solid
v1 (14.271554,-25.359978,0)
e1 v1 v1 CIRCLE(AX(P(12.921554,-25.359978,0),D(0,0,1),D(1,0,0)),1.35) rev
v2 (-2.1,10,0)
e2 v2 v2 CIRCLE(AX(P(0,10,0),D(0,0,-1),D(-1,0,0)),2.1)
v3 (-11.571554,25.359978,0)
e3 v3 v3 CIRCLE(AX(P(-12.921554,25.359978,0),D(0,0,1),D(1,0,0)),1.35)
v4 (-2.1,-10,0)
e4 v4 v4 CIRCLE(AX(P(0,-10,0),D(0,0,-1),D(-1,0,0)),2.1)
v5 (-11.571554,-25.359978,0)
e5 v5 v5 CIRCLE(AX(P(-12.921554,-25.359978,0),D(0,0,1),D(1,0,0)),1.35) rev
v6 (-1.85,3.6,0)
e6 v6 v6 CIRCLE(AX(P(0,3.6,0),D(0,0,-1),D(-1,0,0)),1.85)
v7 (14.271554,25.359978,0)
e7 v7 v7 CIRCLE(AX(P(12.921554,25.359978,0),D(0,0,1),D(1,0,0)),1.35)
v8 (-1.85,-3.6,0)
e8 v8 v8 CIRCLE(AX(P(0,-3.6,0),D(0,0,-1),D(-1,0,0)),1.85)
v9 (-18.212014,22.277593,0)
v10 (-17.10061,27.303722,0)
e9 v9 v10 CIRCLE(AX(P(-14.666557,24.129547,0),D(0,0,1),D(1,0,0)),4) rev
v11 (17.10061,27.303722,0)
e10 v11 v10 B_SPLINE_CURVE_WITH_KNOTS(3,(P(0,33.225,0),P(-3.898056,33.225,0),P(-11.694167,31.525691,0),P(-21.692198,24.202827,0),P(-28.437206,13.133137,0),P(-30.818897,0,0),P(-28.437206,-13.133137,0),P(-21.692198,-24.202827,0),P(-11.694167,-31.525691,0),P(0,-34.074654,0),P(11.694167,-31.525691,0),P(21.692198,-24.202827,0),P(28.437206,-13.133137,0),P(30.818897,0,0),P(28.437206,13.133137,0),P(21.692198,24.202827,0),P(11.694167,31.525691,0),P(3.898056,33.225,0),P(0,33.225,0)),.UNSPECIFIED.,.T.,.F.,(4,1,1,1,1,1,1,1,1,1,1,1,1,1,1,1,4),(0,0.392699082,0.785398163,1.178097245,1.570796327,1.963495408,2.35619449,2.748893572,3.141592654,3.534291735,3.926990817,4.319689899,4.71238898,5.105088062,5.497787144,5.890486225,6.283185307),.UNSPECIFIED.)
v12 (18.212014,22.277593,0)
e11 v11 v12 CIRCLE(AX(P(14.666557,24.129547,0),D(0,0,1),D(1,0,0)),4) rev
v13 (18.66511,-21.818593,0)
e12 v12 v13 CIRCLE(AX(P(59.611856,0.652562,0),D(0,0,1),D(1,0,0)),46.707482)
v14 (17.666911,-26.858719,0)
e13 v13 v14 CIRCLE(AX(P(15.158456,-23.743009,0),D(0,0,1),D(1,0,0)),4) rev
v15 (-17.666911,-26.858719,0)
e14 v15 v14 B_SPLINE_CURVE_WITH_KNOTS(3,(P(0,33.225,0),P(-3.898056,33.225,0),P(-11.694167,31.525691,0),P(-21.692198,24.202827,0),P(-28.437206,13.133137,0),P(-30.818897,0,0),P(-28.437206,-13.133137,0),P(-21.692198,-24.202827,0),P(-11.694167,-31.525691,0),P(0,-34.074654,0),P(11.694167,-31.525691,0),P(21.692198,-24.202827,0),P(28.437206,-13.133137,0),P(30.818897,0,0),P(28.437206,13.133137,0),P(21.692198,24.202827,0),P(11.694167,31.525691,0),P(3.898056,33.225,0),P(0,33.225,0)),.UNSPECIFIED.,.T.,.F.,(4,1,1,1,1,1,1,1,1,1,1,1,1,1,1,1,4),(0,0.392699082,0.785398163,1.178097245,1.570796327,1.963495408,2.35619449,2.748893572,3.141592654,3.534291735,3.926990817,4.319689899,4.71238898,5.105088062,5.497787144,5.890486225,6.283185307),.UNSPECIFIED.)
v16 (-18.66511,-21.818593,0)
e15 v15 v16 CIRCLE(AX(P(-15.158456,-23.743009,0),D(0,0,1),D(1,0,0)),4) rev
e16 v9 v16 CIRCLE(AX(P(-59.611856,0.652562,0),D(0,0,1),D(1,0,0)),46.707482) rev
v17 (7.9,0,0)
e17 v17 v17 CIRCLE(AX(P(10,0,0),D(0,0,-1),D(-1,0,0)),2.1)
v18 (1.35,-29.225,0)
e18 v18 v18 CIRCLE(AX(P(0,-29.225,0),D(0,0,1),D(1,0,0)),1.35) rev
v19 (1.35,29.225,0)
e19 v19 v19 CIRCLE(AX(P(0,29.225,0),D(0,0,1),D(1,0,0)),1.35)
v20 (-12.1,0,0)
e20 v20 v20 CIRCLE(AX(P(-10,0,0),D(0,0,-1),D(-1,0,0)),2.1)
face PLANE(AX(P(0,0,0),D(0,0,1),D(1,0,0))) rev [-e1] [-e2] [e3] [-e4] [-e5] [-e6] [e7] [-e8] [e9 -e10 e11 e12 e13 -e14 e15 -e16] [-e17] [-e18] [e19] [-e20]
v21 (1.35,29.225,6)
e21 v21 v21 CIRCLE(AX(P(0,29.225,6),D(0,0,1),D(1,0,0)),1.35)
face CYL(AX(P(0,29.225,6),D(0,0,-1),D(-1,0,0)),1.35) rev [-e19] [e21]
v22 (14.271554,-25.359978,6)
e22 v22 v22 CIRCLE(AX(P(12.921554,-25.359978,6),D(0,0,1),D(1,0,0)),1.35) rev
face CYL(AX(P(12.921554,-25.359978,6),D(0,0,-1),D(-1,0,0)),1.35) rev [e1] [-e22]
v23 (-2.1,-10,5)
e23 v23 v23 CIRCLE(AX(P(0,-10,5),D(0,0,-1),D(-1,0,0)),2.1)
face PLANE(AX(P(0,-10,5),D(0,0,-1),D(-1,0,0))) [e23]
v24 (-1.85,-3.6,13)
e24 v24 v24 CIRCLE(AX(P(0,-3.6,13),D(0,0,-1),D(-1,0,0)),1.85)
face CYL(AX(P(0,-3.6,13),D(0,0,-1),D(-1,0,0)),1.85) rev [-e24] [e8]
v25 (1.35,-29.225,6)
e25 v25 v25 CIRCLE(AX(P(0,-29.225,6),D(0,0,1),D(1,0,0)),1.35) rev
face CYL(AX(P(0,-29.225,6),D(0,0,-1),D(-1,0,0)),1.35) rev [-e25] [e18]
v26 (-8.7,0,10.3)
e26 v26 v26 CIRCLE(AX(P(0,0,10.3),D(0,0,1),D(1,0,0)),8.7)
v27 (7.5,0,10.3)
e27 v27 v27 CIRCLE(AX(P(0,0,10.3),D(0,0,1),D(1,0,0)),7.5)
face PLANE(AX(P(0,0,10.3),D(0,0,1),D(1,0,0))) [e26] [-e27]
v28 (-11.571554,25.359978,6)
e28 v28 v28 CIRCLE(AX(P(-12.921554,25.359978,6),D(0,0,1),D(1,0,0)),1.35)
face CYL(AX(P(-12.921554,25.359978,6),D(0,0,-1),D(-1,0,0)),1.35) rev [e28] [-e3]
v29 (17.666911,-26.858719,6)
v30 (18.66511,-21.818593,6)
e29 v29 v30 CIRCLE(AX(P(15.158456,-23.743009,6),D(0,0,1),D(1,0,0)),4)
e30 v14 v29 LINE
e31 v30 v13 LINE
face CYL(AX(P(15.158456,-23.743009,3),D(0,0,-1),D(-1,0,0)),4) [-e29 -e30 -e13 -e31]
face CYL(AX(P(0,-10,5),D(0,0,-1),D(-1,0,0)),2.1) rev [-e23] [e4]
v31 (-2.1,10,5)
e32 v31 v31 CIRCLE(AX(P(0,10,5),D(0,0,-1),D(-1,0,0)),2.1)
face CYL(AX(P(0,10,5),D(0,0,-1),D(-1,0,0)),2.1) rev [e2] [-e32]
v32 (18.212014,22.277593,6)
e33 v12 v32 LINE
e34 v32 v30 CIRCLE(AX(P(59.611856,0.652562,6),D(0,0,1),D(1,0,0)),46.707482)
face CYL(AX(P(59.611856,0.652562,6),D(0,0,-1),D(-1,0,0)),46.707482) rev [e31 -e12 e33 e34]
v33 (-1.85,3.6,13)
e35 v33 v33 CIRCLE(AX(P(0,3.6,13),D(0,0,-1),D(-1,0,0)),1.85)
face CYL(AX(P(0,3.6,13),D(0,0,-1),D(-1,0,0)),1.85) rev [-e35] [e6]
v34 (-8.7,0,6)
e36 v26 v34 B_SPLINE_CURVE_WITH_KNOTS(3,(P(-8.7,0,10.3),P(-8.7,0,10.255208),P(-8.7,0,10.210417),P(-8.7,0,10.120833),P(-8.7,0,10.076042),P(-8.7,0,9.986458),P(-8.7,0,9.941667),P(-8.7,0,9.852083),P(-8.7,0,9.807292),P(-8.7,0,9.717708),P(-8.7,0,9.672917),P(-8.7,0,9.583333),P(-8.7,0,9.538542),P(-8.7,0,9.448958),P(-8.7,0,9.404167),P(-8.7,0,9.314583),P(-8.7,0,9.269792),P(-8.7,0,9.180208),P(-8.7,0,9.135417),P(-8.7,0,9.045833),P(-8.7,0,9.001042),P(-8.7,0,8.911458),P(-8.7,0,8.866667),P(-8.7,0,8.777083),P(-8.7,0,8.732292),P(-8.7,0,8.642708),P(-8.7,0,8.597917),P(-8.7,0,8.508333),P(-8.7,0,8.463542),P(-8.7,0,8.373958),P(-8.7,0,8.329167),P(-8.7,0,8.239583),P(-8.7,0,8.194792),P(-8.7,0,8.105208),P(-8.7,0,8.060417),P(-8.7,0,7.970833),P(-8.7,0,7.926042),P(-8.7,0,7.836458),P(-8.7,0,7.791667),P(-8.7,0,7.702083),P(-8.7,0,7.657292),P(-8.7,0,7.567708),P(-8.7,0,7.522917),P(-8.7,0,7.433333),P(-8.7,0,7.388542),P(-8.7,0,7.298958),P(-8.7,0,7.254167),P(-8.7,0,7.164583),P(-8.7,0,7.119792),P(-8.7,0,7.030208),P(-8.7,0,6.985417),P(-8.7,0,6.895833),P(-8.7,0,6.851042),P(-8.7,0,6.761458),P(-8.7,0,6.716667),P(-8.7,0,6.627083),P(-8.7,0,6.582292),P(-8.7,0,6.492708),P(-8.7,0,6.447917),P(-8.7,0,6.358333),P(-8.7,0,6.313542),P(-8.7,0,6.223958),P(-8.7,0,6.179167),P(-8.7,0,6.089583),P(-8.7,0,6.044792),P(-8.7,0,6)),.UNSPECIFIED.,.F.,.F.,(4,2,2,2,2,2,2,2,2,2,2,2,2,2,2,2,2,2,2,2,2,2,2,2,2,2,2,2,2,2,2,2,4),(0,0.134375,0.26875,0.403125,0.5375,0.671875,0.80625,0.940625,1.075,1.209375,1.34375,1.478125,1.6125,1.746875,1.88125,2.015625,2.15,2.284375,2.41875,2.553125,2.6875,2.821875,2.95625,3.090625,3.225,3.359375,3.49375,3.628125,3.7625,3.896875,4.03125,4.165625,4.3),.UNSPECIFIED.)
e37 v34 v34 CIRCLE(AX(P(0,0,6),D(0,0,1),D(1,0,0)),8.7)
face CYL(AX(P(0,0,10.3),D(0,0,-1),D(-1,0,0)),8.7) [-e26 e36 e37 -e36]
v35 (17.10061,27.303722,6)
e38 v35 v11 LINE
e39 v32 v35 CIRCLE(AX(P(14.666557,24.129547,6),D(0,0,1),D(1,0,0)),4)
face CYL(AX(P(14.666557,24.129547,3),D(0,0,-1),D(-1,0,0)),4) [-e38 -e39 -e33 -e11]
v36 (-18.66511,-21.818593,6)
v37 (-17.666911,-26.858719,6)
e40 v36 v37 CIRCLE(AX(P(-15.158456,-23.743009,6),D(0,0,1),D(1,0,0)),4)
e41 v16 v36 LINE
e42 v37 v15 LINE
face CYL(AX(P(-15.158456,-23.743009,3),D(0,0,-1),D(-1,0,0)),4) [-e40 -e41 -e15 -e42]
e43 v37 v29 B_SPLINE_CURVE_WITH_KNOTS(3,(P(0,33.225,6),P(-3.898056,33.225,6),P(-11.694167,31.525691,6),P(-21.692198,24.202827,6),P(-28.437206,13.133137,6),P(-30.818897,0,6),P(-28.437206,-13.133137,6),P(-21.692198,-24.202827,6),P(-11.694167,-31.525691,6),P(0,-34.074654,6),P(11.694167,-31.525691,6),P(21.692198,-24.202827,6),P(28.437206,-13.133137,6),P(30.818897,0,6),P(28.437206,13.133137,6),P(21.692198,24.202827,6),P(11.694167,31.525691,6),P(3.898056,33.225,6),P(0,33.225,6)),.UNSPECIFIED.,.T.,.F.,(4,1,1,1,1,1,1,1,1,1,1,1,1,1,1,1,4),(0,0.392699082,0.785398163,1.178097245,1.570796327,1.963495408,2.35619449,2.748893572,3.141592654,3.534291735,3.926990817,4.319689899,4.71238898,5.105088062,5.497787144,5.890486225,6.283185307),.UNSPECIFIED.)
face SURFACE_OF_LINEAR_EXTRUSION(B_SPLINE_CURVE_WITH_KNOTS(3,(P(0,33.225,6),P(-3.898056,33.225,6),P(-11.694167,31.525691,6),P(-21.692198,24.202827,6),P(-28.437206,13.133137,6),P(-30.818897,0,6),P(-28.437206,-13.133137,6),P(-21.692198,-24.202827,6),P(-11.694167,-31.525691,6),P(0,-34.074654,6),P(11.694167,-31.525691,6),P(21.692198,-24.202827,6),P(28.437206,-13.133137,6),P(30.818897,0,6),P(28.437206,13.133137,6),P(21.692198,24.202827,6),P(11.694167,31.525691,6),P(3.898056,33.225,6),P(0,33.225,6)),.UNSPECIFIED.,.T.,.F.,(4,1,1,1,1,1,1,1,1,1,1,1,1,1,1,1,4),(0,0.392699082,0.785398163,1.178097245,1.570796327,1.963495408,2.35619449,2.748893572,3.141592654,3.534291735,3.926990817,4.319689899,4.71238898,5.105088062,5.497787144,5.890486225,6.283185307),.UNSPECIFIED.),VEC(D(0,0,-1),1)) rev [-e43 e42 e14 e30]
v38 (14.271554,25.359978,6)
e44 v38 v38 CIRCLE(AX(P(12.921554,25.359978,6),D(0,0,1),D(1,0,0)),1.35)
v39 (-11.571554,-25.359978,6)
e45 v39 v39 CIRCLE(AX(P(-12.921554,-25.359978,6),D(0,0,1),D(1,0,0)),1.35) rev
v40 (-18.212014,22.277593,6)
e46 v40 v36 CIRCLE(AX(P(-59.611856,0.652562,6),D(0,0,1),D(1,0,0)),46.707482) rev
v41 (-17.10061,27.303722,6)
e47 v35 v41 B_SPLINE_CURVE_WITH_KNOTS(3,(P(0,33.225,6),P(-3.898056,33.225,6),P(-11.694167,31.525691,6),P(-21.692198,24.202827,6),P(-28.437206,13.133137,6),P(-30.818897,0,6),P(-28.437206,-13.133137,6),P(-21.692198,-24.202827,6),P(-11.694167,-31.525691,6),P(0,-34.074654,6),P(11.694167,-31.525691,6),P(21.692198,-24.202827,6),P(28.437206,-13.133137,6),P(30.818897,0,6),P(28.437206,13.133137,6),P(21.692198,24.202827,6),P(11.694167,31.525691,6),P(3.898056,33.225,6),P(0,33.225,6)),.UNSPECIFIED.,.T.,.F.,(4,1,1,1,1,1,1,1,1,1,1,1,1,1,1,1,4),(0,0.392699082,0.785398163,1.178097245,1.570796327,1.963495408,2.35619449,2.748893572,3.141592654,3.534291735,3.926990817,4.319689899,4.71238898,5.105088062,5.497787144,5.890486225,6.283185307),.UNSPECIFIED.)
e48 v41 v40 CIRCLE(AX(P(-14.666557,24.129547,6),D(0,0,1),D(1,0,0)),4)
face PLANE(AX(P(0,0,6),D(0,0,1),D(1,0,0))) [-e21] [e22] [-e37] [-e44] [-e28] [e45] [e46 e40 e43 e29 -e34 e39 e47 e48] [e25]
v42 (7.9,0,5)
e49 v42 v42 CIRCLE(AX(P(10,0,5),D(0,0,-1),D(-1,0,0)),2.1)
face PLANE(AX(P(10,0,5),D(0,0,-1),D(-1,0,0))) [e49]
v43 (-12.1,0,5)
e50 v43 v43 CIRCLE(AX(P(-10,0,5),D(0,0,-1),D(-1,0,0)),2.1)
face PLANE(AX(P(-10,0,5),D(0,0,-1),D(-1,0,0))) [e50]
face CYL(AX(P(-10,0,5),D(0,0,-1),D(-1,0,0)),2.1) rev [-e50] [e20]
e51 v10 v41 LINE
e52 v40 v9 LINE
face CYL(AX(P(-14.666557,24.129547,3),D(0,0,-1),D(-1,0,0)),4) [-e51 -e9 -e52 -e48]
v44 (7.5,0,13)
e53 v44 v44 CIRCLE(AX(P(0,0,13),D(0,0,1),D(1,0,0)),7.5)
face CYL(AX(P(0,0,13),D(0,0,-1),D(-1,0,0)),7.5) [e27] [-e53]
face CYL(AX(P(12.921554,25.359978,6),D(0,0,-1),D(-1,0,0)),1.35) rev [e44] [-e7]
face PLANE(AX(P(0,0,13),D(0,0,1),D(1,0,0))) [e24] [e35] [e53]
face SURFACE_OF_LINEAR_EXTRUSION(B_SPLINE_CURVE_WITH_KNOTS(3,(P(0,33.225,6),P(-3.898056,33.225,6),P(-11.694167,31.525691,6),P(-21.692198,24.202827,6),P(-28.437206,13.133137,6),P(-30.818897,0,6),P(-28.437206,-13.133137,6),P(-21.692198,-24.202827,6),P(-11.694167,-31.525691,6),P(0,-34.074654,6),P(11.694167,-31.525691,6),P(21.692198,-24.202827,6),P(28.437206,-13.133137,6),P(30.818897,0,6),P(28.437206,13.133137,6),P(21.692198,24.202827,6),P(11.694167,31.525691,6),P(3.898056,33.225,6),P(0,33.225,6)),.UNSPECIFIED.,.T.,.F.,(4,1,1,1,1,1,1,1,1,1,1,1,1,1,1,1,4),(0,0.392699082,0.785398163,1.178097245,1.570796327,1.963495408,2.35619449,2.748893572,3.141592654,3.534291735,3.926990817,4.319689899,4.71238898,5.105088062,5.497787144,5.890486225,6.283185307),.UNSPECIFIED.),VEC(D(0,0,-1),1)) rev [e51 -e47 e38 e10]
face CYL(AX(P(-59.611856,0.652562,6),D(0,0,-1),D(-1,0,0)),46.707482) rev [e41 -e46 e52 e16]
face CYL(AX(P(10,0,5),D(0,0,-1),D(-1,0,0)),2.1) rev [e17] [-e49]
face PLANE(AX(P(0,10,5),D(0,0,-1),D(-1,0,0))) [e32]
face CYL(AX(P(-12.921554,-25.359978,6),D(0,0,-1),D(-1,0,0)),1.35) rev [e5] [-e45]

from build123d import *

# Parameters (mm, degrees)
BOSS_EXTRUDE1_OUTLINE_R = 1.35
BOSS_EXTRUDE1_DEPTH     = 6
FILLET2_R               = 4
SKETCH6_R               = 7.5
BOSS_EXTRUDE5_DEPTH     = 7
SKETCH7_R               = 1.85
CUT_EXTRUDE2_DEPTH      = 41.49625976
SKETCH8_R               = 2.1
CUT_EXTRUDE3_DEPTH      = 5
SKETCH10_R              = 8.7
SKETCH10_R_2            = 7.5
BOSS_EXTRUDE6_DEPTH     = 4.3


# Read off the part's stored shape, not the designer's step: Boss-Extrude1
with BuildPart() as part:
    # Boss-Extrude1 outline → Boss-Extrude1 (new body)
    with BuildSketch(Plane.XY):
        with BuildLine():
            add(Edge.make_bspline(
                [(19.759245017, 25.011508548), (17.277632704, 27.410130174), (11.065749819, 31.662666447), (3.898055626, 33.225), (0, 33.225), (-3.898055626, 33.225), (-11.065749819, 31.662666447), (-17.277632704, 27.410130174), (-19.759245017, 25.011508548)],
                knots=[5.561095323, 5.561095323, 5.561095323, 5.561095323, 5.890486225, 6.283185307, 6.283185307, 6.283185307, 6.675884389, 7.005275292, 7.005275292, 7.005275292, 7.005275292], degree=3))
            ThreePointArc((-19.759245017, 25.011508548), (-12.906795412, 0.176983829), (-20.263531469, -24.512854531))
            add(Edge.make_bspline(
                [(-20.263531469, -24.512854531), (-17.664381341, -27.142112776), (-11.289415252, -31.613914365), (0, -34.074654426), (11.289415252, -31.613914365), (17.664381341, -27.142112776), (20.263531469, -24.512854531)],
                knots=[2.396970099, 2.396970099, 2.396970099, 2.396970099, 2.748893572, 3.141592654, 3.534291735, 3.886215208, 3.886215208, 3.886215208, 3.886215208], degree=3))
            ThreePointArc((20.263531469, -24.512854531), (12.906795412, 0.176983829), (19.759245017, 25.011508548))
        make_face()
        with Locations((-12.92155431, -25.359978236)):
            Circle(BOSS_EXTRUDE1_OUTLINE_R, mode=Mode.SUBTRACT)
        with Locations((0, -29.225)):
            Circle(BOSS_EXTRUDE1_OUTLINE_R, mode=Mode.SUBTRACT)
        with Locations((12.92155431, -25.359978236)):
            Circle(BOSS_EXTRUDE1_OUTLINE_R, mode=Mode.SUBTRACT)
        with Locations((-12.92155431, 25.359978236)):
            Circle(BOSS_EXTRUDE1_OUTLINE_R, mode=Mode.SUBTRACT)
        with Locations((0, 29.225)):
            Circle(BOSS_EXTRUDE1_OUTLINE_R, mode=Mode.SUBTRACT)
        with Locations((12.92155431, 25.359978236)):
            Circle(BOSS_EXTRUDE1_OUTLINE_R, mode=Mode.SUBTRACT)
    extrude(amount=BOSS_EXTRUDE1_DEPTH)

    # Fillet2
    fillet2_edges = [part.edges().sort_by_distance(p)[0] for p in [
        (-20.263531469, -24.512854531, 3),
        (-19.759245017, 25.011508548, 3),
        (19.759245017, 25.011508548, 3),
        (20.263531469, -24.512854531, 3),
    ]]
    fillet(fillet2_edges, radius=FILLET2_R)

    # Sketch6 → Boss-Extrude5 (add)
    with BuildSketch(Plane.XY.offset(6)):
        Circle(SKETCH6_R)
    extrude(amount=BOSS_EXTRUDE5_DEPTH)

    # Sketch7 → Cut-Extrude2 (cut, through all)
    with BuildSketch(Plane(origin=(0, 0, 0), x_dir=(-1, 0, 0), z_dir=(0, 0, -1))):
        with Locations((0, 3.6)):
            Circle(SKETCH7_R)
        with Locations((0, -3.6)):
            Circle(SKETCH7_R)
    extrude(amount=-CUT_EXTRUDE2_DEPTH, mode=Mode.SUBTRACT)

    # Sketch8 → Cut-Extrude3 (cut)
    with BuildSketch(Plane(origin=(0, 0, 0), x_dir=(-1, 0, 0), z_dir=(0, 0, -1))):
        with Locations((10, 0)):
            Circle(SKETCH8_R)
        with Locations((0, -10)):
            Circle(SKETCH8_R)
        with Locations((-10, 0)):
            Circle(SKETCH8_R)
        with Locations((0, 10)):
            Circle(SKETCH8_R)
    extrude(amount=-CUT_EXTRUDE3_DEPTH, mode=Mode.SUBTRACT)

    # Sketch10 → Boss-Extrude6 (add)
    with BuildSketch(Plane.XY.offset(6)):
        with Locations(Location((0, 0, 0), (0, 0, 180))):
            Circle(SKETCH10_R)
        Circle(SKETCH10_R_2, mode=Mode.SUBTRACT)
    extrude(amount=BOSS_EXTRUDE6_DEPTH)


solid = part.part
